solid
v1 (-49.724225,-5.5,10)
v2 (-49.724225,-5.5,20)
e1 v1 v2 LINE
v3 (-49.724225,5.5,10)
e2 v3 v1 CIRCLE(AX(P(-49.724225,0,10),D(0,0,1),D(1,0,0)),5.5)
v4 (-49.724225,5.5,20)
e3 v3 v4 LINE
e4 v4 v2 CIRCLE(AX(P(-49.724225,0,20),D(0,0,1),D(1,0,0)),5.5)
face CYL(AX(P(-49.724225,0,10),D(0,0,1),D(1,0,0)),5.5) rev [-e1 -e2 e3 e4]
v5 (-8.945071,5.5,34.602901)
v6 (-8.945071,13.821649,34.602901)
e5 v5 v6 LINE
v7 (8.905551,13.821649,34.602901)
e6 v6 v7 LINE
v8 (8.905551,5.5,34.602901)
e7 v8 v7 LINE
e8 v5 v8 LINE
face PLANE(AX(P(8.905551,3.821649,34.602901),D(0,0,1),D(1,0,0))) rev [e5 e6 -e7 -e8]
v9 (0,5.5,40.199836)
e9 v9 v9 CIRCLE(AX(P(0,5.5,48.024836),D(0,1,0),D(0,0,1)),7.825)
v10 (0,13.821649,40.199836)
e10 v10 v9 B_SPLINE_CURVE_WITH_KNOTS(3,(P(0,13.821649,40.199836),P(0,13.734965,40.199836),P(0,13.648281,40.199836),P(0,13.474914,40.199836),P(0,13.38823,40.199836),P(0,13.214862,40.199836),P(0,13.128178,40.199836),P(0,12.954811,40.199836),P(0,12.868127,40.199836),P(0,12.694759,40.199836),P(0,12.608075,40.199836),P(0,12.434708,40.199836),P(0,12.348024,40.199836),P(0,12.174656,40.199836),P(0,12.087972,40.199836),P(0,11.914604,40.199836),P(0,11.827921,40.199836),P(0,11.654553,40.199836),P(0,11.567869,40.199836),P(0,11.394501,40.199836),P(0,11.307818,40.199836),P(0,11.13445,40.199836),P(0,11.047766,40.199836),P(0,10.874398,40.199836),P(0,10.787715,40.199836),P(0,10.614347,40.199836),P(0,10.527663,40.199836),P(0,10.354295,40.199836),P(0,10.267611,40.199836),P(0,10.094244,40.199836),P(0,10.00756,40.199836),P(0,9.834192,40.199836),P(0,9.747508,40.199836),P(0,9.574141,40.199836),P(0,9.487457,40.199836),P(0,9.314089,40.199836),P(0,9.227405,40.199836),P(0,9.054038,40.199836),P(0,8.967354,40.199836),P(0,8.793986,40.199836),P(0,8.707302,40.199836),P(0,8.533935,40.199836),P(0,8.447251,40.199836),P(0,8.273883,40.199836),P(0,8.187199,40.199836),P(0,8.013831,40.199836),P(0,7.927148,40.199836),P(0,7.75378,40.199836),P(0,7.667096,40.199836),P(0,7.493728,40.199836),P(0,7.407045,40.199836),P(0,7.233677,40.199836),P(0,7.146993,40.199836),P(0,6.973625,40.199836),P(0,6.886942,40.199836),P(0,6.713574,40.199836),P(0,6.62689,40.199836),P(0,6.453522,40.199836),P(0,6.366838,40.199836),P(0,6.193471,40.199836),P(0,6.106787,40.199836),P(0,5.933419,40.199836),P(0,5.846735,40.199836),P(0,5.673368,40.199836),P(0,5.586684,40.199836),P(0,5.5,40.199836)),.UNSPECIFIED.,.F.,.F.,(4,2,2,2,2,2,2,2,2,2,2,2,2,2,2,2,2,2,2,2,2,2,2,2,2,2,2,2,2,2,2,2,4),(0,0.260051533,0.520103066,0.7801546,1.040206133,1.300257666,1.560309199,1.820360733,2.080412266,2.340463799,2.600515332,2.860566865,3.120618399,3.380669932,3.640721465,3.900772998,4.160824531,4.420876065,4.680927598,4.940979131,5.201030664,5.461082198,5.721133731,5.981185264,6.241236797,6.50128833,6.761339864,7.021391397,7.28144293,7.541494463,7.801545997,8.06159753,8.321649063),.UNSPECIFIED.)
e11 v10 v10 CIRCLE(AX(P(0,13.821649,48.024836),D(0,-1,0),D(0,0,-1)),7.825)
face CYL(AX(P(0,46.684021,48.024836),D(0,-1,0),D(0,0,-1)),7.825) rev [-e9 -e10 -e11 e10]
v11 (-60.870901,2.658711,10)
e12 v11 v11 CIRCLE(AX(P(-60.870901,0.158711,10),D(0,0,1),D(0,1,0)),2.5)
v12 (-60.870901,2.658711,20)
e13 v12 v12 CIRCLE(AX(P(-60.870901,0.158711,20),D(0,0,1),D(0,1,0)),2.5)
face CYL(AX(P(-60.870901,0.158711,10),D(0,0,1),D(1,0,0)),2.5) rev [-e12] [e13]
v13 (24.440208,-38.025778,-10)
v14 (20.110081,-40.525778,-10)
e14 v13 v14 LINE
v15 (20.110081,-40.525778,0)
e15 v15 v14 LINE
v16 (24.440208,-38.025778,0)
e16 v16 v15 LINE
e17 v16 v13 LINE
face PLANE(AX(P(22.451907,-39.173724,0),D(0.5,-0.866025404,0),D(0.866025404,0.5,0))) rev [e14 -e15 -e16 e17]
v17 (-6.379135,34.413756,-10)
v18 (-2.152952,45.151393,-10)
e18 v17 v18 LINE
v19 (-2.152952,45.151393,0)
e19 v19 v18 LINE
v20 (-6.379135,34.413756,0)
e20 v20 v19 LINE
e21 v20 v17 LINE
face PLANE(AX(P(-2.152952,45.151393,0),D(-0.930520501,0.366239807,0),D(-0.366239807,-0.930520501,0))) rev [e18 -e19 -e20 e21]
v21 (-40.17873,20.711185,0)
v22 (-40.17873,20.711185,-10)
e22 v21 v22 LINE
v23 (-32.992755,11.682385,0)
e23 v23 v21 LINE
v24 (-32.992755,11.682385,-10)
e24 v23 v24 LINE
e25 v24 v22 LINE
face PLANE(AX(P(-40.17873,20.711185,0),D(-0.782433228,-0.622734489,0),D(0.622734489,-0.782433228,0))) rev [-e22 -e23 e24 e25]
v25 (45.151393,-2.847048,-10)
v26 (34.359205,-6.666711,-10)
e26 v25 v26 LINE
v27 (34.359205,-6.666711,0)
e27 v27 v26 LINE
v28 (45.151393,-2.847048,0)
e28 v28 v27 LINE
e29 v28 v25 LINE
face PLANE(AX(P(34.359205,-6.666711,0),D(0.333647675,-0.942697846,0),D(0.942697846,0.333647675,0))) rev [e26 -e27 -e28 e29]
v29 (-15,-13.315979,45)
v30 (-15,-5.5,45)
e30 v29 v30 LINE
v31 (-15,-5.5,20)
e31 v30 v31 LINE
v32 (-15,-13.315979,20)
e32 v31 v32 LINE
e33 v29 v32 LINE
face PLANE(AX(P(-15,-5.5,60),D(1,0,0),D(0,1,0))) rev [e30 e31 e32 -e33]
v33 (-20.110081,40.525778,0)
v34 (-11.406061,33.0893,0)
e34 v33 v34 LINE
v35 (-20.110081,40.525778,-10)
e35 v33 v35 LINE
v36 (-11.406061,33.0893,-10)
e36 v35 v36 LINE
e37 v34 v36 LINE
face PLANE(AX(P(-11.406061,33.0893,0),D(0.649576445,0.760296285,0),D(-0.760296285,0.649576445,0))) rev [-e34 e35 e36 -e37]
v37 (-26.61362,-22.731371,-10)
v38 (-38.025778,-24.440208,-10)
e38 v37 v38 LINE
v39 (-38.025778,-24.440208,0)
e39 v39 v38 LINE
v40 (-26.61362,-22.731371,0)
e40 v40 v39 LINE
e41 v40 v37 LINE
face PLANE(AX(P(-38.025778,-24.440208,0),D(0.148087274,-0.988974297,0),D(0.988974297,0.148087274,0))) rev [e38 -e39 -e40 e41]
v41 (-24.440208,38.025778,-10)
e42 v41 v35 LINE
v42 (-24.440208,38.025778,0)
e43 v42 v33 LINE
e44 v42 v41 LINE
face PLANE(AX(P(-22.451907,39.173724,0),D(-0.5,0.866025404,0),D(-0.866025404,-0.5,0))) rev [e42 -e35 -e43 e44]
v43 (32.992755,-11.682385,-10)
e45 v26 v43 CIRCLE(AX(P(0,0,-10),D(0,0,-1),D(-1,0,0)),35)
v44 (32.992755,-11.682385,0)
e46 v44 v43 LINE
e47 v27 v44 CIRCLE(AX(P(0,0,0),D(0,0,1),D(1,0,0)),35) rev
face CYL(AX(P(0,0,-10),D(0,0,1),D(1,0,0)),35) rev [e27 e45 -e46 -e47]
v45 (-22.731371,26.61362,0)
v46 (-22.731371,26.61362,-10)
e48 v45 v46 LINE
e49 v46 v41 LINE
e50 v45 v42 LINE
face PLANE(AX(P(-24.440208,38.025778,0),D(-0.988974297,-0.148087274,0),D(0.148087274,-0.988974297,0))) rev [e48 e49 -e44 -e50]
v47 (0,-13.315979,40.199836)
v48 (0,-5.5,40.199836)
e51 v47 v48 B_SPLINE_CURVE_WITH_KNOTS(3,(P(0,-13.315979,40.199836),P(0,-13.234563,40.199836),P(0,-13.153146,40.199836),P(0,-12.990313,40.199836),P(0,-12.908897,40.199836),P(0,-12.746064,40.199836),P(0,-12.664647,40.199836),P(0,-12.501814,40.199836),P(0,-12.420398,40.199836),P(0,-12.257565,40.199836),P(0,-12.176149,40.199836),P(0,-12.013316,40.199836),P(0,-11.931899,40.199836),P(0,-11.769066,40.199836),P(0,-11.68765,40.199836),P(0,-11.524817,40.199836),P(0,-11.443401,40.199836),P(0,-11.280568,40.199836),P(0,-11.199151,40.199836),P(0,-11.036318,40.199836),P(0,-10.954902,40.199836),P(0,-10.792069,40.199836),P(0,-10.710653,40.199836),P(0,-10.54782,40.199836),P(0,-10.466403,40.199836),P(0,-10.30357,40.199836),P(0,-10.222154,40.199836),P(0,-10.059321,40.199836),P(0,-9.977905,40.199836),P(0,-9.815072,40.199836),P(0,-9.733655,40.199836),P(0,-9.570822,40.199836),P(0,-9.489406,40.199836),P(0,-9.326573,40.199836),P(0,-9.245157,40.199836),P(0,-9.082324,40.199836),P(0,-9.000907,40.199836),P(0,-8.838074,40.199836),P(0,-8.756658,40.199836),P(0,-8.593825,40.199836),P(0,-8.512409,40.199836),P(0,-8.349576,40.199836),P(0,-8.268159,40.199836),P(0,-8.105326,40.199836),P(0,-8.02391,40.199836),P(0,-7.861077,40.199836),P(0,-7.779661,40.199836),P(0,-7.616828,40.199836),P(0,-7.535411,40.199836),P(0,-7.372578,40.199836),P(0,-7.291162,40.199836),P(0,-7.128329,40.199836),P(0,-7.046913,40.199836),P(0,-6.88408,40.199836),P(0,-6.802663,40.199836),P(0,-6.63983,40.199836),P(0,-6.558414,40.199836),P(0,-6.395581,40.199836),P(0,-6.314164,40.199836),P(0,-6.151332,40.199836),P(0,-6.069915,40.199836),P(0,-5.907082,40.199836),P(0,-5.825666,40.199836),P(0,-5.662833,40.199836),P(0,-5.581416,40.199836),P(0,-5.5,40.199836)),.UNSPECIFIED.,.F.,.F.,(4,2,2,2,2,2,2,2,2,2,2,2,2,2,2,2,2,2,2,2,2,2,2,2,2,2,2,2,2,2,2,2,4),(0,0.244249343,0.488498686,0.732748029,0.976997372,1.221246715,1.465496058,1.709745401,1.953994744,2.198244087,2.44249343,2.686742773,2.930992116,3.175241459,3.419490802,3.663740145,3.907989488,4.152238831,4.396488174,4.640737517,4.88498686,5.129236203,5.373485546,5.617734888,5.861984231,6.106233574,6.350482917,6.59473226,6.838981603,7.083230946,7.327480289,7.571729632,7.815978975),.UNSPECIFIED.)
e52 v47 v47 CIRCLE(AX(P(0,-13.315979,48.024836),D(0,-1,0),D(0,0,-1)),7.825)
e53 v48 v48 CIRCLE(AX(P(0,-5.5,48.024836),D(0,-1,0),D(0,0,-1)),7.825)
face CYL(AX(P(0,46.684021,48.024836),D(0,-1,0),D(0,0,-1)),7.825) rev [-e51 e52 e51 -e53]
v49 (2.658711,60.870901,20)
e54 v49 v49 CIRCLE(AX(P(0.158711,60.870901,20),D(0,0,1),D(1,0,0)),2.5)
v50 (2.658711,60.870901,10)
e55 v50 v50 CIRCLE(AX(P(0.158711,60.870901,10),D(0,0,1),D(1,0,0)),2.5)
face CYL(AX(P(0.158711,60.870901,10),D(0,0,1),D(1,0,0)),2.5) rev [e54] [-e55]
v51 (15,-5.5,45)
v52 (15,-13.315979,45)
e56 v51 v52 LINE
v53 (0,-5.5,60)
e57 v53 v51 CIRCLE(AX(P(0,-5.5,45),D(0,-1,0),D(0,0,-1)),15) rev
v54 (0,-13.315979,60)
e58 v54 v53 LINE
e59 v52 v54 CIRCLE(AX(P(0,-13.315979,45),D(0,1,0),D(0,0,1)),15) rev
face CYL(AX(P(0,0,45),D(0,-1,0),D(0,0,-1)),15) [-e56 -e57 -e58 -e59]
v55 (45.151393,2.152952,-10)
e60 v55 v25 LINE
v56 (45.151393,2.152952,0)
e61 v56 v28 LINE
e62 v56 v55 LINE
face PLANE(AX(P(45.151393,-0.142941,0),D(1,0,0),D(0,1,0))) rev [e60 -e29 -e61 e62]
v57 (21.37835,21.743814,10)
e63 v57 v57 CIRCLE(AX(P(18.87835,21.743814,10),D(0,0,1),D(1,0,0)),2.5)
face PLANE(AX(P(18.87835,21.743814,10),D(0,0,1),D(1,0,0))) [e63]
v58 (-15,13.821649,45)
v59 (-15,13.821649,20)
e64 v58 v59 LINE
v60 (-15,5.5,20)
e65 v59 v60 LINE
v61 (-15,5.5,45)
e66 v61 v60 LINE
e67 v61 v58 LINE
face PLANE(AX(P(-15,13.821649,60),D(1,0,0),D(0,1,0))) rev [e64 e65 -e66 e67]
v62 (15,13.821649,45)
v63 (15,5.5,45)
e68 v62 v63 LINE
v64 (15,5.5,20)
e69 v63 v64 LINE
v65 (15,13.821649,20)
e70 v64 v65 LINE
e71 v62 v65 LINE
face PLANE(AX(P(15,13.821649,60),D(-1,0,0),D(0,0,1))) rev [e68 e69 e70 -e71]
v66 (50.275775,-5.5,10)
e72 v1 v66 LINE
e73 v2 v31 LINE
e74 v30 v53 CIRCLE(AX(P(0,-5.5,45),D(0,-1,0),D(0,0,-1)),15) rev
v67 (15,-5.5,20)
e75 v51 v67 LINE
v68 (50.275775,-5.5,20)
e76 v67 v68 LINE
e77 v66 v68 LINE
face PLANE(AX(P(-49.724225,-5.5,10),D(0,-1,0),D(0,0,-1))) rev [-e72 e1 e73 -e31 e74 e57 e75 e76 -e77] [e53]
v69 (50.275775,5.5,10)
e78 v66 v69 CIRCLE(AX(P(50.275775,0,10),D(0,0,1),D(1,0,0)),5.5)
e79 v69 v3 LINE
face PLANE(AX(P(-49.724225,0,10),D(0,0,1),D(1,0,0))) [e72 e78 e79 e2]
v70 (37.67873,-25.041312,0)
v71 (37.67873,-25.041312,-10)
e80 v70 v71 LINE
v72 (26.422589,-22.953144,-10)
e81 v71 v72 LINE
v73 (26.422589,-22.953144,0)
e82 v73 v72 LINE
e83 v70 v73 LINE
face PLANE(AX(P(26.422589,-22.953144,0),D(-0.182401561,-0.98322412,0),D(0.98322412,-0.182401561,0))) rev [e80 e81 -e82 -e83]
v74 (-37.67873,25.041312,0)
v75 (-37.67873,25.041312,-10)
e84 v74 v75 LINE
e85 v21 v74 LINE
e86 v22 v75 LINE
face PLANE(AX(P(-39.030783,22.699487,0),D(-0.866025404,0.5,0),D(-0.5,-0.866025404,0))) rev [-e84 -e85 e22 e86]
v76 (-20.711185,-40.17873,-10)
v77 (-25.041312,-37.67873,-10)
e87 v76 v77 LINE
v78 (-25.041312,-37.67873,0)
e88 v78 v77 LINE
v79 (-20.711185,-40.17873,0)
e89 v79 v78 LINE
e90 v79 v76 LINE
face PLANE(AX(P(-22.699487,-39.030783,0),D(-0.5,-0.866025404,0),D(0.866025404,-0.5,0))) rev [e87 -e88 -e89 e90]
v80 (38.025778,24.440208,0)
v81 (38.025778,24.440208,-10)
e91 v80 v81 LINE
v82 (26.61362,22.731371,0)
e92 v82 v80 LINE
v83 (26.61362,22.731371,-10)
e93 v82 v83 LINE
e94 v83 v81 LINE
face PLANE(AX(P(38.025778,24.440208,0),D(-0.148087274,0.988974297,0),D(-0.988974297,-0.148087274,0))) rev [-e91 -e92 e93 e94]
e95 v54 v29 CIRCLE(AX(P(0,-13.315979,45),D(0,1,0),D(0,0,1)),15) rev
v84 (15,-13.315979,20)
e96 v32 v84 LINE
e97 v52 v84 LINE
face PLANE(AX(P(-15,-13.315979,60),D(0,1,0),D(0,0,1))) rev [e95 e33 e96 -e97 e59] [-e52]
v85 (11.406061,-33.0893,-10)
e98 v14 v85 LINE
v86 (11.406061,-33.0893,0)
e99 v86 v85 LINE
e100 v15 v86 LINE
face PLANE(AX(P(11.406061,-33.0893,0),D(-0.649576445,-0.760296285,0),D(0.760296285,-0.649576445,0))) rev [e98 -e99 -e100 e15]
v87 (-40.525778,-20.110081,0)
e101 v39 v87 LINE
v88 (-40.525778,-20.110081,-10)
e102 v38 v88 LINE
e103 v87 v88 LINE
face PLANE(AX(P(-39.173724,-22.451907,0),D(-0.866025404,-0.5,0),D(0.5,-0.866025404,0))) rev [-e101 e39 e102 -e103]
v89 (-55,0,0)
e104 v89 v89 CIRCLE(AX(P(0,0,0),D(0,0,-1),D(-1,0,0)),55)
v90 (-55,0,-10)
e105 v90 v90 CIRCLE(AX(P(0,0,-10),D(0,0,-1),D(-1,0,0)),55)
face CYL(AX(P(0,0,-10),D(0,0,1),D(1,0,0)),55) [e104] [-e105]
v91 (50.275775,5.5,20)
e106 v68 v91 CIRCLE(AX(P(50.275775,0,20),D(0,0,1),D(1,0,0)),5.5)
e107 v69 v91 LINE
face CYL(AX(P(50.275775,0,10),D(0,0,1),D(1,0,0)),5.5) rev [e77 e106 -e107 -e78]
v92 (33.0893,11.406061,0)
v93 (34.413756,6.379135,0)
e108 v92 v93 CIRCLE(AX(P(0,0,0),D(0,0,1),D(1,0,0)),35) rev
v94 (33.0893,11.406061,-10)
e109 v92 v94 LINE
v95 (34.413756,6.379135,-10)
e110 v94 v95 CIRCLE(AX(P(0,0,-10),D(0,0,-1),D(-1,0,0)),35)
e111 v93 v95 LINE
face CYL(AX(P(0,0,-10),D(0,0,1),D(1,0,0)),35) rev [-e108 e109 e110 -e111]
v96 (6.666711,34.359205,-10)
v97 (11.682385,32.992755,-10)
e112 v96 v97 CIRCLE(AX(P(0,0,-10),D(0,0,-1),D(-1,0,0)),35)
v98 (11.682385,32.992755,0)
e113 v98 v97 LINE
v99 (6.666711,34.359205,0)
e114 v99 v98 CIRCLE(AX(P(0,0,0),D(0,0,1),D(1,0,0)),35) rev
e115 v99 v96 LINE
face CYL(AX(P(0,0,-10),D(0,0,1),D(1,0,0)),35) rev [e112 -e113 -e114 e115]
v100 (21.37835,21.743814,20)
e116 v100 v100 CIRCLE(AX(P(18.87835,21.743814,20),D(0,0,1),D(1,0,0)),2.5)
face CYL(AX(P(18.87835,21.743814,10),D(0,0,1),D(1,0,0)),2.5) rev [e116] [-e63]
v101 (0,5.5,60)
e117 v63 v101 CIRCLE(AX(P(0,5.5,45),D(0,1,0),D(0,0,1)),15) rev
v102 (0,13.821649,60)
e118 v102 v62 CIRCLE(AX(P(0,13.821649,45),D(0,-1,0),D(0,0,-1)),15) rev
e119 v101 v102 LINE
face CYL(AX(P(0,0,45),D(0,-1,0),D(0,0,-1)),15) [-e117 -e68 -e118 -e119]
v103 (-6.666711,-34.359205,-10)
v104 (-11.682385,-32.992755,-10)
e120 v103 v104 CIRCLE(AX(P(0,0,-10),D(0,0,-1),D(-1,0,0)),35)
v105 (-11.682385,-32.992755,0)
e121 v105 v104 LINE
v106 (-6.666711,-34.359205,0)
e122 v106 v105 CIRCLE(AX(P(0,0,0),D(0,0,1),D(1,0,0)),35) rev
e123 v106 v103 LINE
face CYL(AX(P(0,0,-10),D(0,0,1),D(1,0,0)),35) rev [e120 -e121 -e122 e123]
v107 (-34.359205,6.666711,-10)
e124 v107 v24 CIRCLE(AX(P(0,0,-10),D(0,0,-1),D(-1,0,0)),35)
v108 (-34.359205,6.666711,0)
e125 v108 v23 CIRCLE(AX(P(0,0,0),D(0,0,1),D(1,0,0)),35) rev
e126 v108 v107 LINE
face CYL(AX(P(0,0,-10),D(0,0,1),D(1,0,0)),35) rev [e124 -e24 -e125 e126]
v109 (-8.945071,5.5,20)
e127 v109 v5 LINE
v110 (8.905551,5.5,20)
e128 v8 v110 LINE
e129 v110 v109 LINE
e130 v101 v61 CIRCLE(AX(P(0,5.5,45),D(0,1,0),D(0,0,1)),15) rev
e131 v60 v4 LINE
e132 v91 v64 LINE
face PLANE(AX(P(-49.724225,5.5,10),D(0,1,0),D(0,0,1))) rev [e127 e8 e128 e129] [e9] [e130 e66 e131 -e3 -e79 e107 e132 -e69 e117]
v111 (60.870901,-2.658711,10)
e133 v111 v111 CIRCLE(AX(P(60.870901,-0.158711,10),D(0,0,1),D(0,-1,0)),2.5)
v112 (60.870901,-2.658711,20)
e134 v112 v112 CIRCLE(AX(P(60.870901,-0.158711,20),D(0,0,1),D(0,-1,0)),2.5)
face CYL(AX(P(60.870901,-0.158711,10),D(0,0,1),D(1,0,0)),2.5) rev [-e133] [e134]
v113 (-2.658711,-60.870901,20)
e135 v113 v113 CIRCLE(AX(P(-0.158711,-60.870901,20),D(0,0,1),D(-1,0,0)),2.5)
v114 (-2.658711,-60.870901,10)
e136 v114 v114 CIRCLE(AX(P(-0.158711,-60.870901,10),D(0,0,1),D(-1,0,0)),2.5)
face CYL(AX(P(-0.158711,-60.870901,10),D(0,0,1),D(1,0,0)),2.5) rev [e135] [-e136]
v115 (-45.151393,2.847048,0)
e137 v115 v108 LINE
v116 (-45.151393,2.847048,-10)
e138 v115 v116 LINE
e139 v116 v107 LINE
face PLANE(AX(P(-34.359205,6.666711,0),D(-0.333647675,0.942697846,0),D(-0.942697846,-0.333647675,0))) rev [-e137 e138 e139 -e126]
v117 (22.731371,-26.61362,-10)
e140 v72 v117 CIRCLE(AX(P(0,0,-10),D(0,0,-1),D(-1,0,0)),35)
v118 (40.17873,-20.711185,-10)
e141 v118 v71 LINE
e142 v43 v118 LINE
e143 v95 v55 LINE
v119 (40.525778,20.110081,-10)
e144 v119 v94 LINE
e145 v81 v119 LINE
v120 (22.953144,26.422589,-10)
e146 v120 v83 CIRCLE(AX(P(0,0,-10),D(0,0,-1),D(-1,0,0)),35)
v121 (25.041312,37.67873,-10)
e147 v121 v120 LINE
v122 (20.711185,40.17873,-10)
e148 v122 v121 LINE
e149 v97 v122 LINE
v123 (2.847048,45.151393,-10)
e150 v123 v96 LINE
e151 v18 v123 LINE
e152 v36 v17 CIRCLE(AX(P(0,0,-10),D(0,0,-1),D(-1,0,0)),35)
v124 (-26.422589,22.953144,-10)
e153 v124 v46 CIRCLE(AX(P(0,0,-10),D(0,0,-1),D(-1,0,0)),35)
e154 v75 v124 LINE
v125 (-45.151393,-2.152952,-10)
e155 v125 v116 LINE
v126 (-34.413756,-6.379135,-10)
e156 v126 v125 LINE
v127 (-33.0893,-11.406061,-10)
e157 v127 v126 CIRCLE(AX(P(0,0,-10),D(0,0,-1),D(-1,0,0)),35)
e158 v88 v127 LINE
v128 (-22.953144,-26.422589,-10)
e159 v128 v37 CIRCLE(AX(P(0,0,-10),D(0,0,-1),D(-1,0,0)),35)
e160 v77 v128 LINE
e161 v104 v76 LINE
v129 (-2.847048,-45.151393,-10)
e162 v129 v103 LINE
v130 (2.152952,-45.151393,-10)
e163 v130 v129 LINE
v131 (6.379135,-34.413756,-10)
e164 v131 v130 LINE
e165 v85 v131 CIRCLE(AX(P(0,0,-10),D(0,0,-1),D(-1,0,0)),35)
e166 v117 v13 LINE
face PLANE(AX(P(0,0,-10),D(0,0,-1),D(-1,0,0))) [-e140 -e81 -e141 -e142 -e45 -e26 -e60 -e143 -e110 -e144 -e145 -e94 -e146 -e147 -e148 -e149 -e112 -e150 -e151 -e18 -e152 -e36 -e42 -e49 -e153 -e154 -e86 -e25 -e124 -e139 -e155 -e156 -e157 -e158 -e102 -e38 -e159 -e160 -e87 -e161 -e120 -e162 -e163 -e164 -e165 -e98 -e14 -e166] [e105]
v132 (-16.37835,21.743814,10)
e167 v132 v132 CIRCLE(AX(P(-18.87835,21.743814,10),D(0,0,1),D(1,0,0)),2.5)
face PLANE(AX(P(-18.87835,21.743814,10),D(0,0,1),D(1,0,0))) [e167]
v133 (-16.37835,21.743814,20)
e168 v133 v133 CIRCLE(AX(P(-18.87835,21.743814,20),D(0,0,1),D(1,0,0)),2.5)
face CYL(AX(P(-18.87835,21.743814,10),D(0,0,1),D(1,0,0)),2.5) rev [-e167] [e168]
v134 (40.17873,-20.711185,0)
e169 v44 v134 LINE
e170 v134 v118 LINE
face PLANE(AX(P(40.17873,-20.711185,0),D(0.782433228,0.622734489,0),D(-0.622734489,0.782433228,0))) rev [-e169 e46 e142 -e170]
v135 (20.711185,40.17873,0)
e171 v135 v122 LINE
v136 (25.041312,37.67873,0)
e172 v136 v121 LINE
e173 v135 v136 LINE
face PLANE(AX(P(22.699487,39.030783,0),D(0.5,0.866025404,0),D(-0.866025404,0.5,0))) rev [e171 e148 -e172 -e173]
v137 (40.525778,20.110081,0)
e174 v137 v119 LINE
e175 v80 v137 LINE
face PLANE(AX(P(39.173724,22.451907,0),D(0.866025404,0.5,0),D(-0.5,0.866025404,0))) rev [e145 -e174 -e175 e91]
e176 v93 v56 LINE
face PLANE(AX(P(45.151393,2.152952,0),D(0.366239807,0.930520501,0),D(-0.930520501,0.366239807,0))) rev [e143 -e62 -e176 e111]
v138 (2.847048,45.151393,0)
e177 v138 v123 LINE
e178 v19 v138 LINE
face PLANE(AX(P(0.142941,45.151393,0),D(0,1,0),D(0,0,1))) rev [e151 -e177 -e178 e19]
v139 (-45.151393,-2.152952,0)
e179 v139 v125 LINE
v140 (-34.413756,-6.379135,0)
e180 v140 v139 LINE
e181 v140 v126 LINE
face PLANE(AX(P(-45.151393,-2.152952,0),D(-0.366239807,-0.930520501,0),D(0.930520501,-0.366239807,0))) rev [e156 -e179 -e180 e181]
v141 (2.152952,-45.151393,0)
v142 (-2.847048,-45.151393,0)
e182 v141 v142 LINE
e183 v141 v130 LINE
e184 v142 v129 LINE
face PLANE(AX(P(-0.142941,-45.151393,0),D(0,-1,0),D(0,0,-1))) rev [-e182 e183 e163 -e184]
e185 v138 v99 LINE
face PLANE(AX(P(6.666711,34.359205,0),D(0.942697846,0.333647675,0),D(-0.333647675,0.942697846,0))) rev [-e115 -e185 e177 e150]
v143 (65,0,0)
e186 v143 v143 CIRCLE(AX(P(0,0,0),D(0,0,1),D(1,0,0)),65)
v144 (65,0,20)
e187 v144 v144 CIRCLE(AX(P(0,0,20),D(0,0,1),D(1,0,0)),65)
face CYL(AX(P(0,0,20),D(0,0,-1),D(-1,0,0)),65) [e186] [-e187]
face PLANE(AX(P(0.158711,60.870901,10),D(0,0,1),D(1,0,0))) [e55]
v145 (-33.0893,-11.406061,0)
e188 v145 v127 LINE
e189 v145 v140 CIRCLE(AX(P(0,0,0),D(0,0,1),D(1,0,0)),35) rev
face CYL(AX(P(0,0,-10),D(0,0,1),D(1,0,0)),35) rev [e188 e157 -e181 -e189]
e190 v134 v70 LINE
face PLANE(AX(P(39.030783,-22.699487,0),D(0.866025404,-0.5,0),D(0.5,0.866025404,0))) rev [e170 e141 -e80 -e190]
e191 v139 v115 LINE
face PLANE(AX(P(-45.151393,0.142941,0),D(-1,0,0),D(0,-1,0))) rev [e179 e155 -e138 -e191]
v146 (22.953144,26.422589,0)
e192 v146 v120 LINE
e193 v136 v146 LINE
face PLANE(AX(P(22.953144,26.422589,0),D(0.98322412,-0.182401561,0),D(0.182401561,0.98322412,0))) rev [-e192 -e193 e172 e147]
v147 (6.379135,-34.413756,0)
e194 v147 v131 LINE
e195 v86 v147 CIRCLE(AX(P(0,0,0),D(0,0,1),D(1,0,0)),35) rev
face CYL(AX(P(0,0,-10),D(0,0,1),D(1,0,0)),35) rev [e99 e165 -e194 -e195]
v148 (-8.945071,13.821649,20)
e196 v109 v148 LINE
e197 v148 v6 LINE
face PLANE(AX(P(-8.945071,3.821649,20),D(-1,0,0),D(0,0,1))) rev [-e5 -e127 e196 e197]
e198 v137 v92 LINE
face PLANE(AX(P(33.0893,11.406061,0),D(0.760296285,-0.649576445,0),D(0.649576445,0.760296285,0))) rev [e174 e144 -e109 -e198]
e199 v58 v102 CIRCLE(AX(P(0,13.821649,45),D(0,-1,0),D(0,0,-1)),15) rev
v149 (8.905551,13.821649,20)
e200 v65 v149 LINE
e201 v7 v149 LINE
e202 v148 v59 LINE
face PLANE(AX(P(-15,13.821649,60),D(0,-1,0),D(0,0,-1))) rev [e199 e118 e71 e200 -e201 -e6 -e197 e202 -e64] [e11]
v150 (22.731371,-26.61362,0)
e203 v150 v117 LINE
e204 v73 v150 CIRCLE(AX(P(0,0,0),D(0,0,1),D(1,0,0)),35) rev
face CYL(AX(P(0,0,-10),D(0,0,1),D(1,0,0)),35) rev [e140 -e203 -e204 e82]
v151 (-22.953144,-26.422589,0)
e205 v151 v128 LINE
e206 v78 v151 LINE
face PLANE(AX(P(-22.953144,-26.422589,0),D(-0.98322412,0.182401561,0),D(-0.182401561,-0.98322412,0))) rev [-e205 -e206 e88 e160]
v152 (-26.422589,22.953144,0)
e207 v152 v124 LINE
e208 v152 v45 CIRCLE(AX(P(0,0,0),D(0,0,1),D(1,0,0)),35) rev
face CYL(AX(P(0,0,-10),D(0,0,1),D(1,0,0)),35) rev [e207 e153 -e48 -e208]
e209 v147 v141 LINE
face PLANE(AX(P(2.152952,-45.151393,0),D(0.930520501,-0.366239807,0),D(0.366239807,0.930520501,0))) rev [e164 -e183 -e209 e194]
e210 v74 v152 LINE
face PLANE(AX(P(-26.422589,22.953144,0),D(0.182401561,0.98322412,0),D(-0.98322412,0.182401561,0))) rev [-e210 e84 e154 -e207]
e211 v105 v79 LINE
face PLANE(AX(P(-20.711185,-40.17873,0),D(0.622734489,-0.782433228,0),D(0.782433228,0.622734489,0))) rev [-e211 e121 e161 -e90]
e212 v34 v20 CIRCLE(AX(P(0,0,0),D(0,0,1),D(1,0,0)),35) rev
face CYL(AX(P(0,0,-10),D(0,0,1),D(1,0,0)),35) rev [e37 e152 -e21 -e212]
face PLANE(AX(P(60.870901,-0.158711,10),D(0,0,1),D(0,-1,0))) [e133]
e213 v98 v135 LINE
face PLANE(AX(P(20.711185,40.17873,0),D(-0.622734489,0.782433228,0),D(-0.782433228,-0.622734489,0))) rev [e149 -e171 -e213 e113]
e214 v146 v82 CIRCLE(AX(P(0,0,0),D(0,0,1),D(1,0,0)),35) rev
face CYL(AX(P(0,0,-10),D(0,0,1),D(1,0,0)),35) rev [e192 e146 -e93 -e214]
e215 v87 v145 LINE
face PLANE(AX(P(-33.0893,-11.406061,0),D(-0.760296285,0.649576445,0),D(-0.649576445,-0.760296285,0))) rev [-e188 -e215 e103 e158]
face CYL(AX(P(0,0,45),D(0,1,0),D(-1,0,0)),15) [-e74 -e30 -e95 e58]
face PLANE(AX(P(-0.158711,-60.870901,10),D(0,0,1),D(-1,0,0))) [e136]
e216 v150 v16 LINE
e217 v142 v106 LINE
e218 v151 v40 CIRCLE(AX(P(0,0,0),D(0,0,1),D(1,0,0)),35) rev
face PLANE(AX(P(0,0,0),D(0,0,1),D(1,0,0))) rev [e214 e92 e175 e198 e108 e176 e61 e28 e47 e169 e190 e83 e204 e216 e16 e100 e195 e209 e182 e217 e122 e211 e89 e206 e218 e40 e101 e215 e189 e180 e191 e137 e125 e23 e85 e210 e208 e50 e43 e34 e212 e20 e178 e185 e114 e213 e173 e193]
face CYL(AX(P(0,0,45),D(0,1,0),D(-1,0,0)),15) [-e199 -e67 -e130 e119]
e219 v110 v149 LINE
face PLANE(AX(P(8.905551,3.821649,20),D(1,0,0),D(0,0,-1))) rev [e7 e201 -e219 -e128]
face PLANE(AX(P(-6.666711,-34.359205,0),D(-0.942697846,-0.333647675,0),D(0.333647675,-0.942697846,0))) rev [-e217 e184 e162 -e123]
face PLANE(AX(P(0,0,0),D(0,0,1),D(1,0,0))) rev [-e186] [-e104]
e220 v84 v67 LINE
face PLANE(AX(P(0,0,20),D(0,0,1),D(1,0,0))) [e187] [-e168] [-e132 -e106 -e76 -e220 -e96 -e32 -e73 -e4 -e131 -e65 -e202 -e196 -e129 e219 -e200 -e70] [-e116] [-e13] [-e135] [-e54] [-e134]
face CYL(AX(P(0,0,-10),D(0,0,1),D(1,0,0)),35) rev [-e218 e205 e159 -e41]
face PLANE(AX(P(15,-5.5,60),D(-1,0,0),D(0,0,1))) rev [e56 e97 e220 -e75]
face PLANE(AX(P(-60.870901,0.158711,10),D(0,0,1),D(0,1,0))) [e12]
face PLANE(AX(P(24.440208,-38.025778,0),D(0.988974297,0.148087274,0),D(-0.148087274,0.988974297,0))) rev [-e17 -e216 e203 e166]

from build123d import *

# Parameters (mm, degrees)
SKETCH2_R           = 65
BOSS_EXTRUDE1_DEPTH = 20
SKETCH4_R           = 55
BOSS_EXTRUDE2_DEPTH = 10
SHELL1_T            = -20
CUT_EXTRUDE4_DEPTH  = 10
CIRPATTERN3_COUNT   = 12
CUT_EXTRUDE5_DEPTH  = 10
SKETCH13_R          = 2.5
CUT_EXTRUDE7_DEPTH  = 10
CIRPATTERN4_COUNT   = 4
SKETCH14_W          = 30
SKETCH14_H          = 8.321649063
SKETCH14_H_2        = 7.815978975
BOSS_EXTRUDE3_DEPTH = 40
SKETCH15_R          = 7.825
CUT_EXTRUDE8_DEPTH  = 60
FILLET3_R           = 15
SKETCH16_W          = 17.850622268
SKETCH16_H          = 14.602901006
CUT_EXTRUDE9_DEPTH  = 10
SKETCH19_R          = 2.5
CUT_EXTRUDE10_DEPTH = 10


with BuildPart() as part:
    # Sketch2 → Boss-Extrude1 (new body)
    with BuildSketch(Plane(origin=(0, 0, 0), x_dir=(0, 1, 0), z_dir=(0, 0, 1))):
        with Locations(Location((0, 0, 0), (0, 0, 270))):
            Circle(SKETCH2_R)
    extrude(amount=BOSS_EXTRUDE1_DEPTH)

    # Sketch4 → Boss-Extrude2 (add)
    with BuildSketch(Plane(origin=(0, 0, 0), x_dir=(1, 0, 0), z_dir=(0, 0, -1))):
        with Locations(Location((0, 0, 0), (0, 0, 180))):
            Circle(SKETCH4_R)
    extrude(amount=BOSS_EXTRUDE2_DEPTH)

    # Shell1
    shell1_openings = [part.faces().sort_by_distance(p)[0] for p in [
        (0, 0, -10),
    ]]
    offset(amount=SHELL1_T, openings=shell1_openings, kind=Kind.INTERSECTION)

    # Sketch11 → Cut-Extrude4 (cut)
    with BuildSketch(Plane(origin=(0, 0, -10), x_dir=(1, 0, 0), z_dir=(0, 0, -1))):
        Polygon((-0.14294056, 45.151393391), (2.152952162, 45.151393391), (6.37913534, 34.41375644), (-6.666711392, 34.359204869), (-2.847047838, 45.151393391), align=None)
    cut_extrude4 = extrude(amount=-CUT_EXTRUDE4_DEPTH, mode=Mode.SUBTRACT)

    # CirPattern3: Cut-Extrude4 ×12 about axis
    cirpattern3_axis = Axis((0, 0, 0), (0, 0, 1))
    for i in range(1, CIRPATTERN3_COUNT):
        add(cut_extrude4.rotate(cirpattern3_axis, i * 360 / CIRPATTERN3_COUNT), mode=Mode.SUBTRACT)

    # Sketch12 → Cut-Extrude5 (cut)
    with BuildSketch(Plane.XY.offset(20)):
        with BuildLine():
            Line((-49.724225287, 5.5), (50.275774713, 5.5))
            ThreePointArc((50.275774713, 5.5), (55.775774713, 0), (50.275774713, -5.5))
            Line((50.275774713, -5.5), (-49.724225287, -5.5))
            ThreePointArc((-49.724225287, -5.5), (-55.224225287, 0), (-49.724225287, 5.5))
        make_face()
    extrude(amount=-CUT_EXTRUDE5_DEPTH, mode=Mode.SUBTRACT)

    # Sketch13 → Cut-Extrude7 (cut)
    with BuildSketch(Plane.XY.offset(20)):
        with Locations((0.158711009, 60.870900594)):
            Circle(SKETCH13_R)
    cut_extrude7 = extrude(amount=-CUT_EXTRUDE7_DEPTH, mode=Mode.SUBTRACT)

    # CirPattern4: Cut-Extrude7 ×4 about axis
    cirpattern4_axis = Axis((0, 0, 0), (0, 0, 1))
    for i in range(1, CIRPATTERN4_COUNT):
        add(cut_extrude7.rotate(cirpattern4_axis, i * 360 / CIRPATTERN4_COUNT), mode=Mode.SUBTRACT)

    # Sketch14 → Boss-Extrude3 (add)
    with BuildSketch(Plane.XY.offset(20)):
        with Locations((0, 9.660824532)):
            Rectangle(SKETCH14_W, SKETCH14_H)
        with Locations((0, -9.407989488)):
            Rectangle(SKETCH14_W, SKETCH14_H_2)
    extrude(amount=BOSS_EXTRUDE3_DEPTH)

    # Sketch15 → Cut-Extrude8 (cut)
    with BuildSketch(Plane.XZ.offset(13.315978975)):
        with Locations(Location((0, 48.024835591, 0), (0, 0, 270))):
            Circle(SKETCH15_R)
    extrude(amount=-CUT_EXTRUDE8_DEPTH, mode=Mode.SUBTRACT)

    # Fillet3
    fillet3_edges = [part.edges().sort_by_distance(p)[0] for p in [
        (-15, -9.407989488, 60),
        (-15, 9.660824531, 60),
        (15, 9.660824531, 60),
        (15, -9.407989488, 60),
    ]]
    fillet(fillet3_edges, radius=FILLET3_R - 0.0001)  # a hair under: the kernel refuses the full size

    # Sketch16 → Cut-Extrude9 (cut)
    with BuildSketch(Plane(origin=(0, 13.821649063, 0), x_dir=(-1, 0, 0), z_dir=(0, 1, 0))):
        with Locations((0.019760197, 27.301450503)):
            Rectangle(SKETCH16_W, SKETCH16_H)
    extrude(amount=-CUT_EXTRUDE9_DEPTH, mode=Mode.SUBTRACT)

    # Sketch19 → Cut-Extrude10 (cut)
    with BuildSketch(Plane.XY.offset(20)):
        with Locations((-18.87834994, 21.74381377)):
            Circle(SKETCH19_R)
        with Locations((18.87834994, 21.74381377)):
            Circle(SKETCH19_R)
    extrude(amount=-CUT_EXTRUDE10_DEPTH, mode=Mode.SUBTRACT)


solid = part.part
